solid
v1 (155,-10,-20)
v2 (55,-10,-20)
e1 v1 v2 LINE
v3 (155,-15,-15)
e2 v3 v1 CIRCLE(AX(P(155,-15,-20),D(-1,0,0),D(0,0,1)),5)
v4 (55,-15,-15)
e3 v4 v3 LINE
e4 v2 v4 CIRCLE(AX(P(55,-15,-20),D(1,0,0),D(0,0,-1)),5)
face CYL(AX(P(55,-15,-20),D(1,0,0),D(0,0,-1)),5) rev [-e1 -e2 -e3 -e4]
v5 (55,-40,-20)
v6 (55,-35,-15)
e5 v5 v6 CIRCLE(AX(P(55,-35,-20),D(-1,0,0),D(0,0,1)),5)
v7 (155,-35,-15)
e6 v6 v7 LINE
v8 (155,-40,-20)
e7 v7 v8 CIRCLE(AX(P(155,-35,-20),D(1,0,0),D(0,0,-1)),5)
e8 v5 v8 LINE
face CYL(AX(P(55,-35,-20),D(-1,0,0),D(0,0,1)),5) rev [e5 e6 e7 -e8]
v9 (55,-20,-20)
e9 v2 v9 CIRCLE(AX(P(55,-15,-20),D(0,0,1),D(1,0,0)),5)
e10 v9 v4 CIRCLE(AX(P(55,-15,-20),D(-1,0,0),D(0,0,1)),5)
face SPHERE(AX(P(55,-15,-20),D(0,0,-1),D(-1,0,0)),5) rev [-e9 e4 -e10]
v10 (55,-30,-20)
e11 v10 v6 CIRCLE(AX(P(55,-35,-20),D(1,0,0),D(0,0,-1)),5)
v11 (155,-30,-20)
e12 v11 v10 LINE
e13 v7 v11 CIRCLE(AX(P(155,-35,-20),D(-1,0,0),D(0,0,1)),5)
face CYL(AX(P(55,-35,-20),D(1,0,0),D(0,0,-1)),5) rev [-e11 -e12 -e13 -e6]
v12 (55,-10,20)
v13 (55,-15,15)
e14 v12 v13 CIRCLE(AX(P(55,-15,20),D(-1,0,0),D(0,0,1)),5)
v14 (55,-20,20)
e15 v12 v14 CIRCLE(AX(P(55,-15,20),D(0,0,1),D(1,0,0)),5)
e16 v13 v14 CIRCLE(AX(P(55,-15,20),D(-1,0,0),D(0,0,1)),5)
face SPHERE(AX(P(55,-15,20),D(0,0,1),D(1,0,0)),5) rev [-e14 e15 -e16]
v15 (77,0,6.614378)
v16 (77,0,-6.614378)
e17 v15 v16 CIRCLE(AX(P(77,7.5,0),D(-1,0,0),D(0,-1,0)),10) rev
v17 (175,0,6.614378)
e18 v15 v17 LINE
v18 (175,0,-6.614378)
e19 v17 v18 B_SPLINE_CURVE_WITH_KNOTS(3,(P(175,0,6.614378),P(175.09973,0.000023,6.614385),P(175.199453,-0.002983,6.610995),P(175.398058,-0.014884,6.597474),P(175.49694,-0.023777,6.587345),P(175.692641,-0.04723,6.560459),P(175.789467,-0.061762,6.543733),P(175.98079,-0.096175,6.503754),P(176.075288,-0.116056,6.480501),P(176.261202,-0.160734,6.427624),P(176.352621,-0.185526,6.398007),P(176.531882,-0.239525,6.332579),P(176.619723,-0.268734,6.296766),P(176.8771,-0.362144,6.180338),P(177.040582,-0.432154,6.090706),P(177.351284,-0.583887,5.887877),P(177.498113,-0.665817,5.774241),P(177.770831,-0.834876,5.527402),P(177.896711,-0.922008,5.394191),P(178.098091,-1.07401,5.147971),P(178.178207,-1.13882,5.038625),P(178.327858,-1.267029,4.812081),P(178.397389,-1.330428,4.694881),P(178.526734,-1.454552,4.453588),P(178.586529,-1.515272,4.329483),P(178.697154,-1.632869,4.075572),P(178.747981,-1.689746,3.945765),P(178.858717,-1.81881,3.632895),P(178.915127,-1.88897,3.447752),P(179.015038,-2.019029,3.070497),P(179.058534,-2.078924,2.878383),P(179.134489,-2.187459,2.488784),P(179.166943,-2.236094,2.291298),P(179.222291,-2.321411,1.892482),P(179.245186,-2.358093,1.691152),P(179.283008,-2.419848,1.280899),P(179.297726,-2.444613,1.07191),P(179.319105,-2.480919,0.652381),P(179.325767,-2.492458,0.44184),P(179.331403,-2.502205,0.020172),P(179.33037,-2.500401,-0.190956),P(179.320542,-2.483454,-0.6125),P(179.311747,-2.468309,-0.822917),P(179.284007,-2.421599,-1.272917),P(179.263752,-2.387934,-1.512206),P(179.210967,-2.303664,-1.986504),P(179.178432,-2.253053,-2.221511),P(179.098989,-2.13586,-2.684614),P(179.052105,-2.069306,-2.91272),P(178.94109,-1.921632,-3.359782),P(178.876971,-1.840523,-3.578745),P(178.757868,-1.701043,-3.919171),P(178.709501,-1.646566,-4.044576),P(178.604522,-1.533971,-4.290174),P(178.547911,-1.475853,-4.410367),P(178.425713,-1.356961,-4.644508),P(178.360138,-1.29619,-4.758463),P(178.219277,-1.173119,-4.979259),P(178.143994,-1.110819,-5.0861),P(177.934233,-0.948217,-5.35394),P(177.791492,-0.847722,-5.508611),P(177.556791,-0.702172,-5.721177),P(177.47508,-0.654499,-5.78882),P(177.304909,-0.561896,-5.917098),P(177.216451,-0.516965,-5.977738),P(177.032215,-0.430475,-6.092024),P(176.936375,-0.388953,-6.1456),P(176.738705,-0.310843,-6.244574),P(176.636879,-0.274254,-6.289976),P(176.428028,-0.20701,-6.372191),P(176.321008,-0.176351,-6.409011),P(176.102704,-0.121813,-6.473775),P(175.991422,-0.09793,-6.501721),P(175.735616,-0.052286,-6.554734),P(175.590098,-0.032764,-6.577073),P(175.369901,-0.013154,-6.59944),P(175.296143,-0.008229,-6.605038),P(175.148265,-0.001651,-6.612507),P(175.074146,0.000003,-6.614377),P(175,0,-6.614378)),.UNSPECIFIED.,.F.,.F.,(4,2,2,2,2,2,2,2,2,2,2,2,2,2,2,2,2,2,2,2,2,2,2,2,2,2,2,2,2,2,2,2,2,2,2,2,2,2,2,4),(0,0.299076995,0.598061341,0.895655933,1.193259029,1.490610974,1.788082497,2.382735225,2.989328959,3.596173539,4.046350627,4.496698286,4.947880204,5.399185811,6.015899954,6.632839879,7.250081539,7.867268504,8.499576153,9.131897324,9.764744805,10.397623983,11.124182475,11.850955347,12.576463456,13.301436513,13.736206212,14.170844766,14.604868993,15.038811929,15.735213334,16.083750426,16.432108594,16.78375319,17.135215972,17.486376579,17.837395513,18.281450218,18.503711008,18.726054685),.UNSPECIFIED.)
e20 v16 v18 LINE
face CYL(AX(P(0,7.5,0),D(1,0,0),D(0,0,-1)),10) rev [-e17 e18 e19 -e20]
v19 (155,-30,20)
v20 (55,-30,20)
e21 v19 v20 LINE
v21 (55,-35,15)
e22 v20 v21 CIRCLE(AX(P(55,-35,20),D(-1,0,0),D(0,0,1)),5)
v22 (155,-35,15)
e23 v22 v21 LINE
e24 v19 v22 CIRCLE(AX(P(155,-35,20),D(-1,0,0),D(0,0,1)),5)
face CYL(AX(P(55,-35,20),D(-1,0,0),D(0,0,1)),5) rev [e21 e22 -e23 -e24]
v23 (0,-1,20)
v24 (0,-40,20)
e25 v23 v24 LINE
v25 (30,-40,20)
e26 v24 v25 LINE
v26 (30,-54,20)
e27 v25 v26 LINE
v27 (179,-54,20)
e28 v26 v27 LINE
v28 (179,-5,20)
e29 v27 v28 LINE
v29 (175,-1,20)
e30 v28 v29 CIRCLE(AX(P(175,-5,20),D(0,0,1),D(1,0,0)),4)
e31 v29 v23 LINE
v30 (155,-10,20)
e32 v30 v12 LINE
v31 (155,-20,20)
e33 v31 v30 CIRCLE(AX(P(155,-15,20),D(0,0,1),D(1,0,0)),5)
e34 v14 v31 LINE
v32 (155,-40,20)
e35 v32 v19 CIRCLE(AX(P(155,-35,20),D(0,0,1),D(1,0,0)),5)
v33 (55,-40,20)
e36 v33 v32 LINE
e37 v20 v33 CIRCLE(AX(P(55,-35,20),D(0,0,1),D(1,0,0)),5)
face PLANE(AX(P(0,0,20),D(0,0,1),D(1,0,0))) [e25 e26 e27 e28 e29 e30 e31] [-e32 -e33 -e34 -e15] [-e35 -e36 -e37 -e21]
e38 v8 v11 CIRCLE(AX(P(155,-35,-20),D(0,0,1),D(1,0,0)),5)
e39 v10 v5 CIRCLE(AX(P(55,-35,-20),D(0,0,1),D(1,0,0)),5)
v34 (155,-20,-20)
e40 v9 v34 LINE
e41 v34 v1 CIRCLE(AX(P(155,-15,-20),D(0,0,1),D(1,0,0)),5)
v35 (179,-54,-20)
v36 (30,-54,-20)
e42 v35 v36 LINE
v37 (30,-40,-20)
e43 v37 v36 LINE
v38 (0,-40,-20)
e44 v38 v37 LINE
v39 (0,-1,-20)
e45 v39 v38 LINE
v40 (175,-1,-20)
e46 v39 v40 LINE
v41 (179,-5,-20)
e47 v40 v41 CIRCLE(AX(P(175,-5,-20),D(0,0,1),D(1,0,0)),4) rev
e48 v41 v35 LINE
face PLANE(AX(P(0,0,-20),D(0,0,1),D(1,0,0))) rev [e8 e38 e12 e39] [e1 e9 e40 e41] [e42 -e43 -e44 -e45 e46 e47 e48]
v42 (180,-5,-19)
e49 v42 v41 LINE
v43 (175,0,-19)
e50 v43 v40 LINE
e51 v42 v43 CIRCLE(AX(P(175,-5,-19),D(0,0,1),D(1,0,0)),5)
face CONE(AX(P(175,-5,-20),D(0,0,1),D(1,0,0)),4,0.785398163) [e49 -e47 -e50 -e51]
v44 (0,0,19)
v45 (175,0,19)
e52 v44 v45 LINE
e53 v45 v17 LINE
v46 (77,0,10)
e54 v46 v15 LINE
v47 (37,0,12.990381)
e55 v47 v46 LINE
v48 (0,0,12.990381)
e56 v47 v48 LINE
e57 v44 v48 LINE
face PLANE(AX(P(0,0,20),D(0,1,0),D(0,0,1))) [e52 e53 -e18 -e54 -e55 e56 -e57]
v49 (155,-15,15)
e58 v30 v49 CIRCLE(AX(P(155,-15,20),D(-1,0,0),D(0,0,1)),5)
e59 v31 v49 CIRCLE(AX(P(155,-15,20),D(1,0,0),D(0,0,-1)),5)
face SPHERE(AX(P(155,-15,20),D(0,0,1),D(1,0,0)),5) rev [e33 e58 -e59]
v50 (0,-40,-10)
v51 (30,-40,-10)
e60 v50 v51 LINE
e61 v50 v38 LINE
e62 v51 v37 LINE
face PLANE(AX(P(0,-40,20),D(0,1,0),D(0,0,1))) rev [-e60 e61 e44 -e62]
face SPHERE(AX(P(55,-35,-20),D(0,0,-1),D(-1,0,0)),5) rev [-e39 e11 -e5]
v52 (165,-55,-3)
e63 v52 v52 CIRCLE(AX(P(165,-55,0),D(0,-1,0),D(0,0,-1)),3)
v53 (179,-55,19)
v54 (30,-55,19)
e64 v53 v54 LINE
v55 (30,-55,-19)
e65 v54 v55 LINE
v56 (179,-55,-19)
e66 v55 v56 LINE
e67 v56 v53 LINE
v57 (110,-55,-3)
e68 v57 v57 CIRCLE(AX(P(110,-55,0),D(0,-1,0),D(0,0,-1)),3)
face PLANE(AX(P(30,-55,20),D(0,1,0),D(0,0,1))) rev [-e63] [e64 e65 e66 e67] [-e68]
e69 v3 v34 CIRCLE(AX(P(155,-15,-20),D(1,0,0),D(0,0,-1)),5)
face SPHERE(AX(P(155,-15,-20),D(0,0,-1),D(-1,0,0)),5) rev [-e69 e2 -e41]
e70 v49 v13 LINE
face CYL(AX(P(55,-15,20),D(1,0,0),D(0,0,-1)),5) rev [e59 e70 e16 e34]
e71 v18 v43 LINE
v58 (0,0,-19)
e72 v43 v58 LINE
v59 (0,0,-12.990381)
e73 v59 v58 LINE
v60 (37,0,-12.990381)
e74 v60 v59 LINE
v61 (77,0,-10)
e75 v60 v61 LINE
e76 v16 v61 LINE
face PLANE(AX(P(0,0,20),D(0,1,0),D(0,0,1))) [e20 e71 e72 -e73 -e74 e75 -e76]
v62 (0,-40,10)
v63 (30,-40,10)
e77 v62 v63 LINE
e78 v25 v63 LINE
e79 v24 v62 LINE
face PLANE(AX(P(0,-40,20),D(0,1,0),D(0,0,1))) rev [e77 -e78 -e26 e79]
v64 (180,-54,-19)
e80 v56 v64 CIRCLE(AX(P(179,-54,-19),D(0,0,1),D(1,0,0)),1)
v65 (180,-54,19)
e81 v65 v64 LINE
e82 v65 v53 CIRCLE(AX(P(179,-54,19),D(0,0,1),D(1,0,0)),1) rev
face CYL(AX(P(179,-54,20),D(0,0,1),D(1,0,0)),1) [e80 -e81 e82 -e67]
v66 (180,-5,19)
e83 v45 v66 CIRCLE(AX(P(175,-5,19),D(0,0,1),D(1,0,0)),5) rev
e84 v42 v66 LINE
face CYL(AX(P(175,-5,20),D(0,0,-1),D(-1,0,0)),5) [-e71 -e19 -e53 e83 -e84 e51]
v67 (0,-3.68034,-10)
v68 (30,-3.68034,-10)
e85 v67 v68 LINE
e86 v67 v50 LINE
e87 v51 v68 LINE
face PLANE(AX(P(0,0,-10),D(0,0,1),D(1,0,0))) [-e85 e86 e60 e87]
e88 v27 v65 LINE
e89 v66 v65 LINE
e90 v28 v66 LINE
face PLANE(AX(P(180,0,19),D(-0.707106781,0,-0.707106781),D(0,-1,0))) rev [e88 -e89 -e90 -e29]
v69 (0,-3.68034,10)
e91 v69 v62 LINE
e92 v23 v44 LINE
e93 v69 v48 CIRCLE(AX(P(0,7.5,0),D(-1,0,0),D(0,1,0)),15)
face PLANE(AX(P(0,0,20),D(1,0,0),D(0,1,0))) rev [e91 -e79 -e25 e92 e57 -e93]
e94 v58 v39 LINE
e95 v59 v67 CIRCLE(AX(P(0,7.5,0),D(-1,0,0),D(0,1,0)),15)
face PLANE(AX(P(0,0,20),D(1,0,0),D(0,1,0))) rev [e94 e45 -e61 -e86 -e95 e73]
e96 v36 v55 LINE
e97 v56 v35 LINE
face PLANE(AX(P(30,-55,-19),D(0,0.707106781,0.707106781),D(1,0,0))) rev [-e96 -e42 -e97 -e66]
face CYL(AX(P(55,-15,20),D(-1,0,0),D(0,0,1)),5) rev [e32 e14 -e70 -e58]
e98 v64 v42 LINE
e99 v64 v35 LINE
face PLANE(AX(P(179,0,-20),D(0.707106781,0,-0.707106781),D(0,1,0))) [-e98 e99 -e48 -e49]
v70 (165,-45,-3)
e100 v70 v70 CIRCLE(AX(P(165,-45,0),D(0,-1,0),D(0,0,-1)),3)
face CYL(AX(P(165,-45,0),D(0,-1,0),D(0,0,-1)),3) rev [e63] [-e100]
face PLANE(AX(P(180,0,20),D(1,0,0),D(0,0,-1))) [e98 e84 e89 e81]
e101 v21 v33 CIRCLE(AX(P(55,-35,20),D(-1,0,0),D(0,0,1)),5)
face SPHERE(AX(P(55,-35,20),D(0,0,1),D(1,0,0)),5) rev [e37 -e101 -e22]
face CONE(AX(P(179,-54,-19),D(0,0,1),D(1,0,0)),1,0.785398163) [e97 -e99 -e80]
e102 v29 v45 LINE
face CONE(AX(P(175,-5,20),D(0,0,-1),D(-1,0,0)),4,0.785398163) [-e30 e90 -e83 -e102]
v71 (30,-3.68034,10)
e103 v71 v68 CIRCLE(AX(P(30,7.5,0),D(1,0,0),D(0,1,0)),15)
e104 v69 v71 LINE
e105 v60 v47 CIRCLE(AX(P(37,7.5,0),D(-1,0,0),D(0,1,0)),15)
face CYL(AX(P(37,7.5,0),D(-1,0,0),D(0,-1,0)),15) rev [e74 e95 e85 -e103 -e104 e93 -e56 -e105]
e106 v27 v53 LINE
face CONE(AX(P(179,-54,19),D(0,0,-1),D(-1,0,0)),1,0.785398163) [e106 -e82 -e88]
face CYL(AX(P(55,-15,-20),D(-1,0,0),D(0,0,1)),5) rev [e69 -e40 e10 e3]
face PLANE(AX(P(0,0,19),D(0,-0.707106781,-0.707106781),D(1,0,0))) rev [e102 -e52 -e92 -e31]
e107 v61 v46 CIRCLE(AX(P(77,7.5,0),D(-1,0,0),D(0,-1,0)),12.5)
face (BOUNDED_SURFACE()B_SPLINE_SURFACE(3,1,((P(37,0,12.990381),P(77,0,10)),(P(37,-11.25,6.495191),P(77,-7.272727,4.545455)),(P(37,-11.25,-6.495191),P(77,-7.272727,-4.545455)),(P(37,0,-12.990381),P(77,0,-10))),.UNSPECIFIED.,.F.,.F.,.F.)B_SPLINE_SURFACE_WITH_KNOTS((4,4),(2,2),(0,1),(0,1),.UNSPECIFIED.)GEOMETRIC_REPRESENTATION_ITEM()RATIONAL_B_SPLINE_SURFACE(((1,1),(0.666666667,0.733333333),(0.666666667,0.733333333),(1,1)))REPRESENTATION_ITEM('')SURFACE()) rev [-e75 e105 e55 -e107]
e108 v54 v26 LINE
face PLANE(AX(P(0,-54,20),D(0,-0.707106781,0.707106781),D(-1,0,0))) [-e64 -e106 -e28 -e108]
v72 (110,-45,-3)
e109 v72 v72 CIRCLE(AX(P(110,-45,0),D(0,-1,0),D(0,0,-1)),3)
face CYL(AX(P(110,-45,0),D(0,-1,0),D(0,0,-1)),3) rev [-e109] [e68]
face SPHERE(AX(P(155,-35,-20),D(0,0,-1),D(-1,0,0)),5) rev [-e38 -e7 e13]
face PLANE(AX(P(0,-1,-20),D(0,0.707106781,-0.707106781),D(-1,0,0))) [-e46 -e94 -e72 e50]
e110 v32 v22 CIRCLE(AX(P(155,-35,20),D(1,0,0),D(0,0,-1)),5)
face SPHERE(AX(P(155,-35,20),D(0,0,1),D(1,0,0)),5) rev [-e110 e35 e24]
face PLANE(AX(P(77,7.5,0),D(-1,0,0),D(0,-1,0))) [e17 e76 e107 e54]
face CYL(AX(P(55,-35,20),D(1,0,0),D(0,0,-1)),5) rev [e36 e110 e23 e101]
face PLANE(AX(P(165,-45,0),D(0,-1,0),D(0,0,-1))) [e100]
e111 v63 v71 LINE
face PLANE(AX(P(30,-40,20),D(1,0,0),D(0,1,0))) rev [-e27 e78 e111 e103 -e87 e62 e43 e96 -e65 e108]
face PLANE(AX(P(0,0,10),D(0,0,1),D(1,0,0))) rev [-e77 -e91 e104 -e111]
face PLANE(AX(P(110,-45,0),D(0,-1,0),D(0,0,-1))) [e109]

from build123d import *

# Parameters (mm, degrees)
EXTRUDE_1_DEPTH                = 20
SKETCH_2_W                     = 30
SKETCH_2_H                     = 40
CUT_EXTRUDE_1_DEPTH            = 10
FILLET_1_R                     = 5
FILLET_2_R                     = 1
CUT_EXTRUDE_2_DEPTH            = 37
CUT_EXTRUDE_3_DEPTH            = 190.274932307
CHAMFER_1_SIZE                 = 1
CUT_EXTRUDE_4_DEPTH            = 5
FILLET_3_R                     = 5
PATTERN_LINEAR_7_COUNT         = 2
PATTERN_LINEAR_7_PITCH         = 20
FILLET_3_OF_PATTERN_LINEAR_7_R = 5
SKETCH_7_R                     = 3
CUT_EXTRUDE_5_DEPTH            = 10


# Read off the part's stored shape, not the designer's step: 대칭 복사4
with BuildPart() as part:
    # 스케치1 → 보스-돌출1 (new, symmetric)
    with BuildSketch(Plane.XY):
        Polygon((0, -40), (30, -40), (30, -55), (180, -55), (180, 0), (0, 0), align=None)
    extrude(amount=EXTRUDE_1_DEPTH, both=True)

    # 스케치2 → 컷-돌출1 (cut, symmetric)
    with BuildSketch(Plane.XY):
        with Locations((15, -20)):
            Rectangle(SKETCH_2_W, SKETCH_2_H)
    extrude(amount=CUT_EXTRUDE_1_DEPTH, both=True, mode=Mode.SUBTRACT)

    # 필렛1
    fillet_1_edges = [part.edges().sort_by_distance(p)[0] for p in [
        (180, 0, 0),
    ]]
    fillet(fillet_1_edges, radius=FILLET_1_R)

    # 필렛2
    fillet_2_edges = [part.edges().sort_by_distance(p)[0] for p in [
        (180, -55, 0),
    ]]
    fillet(fillet_2_edges, radius=FILLET_2_R)

    # 스케치3 → 컷-돌출2 (cut)
    with BuildSketch(Plane.ZY):
        with BuildLine():
            Line((-12.990381057, 0), (12.990381057, 0))
            ThreePointArc((12.990381057, 0), (0, -7.5), (-12.990381057, 0))
        make_face()
    extrude(amount=-CUT_EXTRUDE_2_DEPTH, mode=Mode.SUBTRACT)

    # 스케치4 → 컷-돌출3 (cut, through all)
    with BuildSketch(Plane(origin=(180, 0, 0), x_dir=(0, 0, -1), z_dir=(1, 0, 0))):
        with BuildLine():
            Line((-6.614378278, 0), (6.614378278, 0))
            ThreePointArc((6.614378278, 0), (0, -2.5), (-6.614378278, 0))
        make_face()
    extrude(amount=-CUT_EXTRUDE_3_DEPTH, mode=Mode.SUBTRACT)

    # 스케치6 for 컷-로프트1 → 컷-로프트1 section 0
    with BuildSketch(Plane.ZY.offset(-37)):
        with BuildLine():
            Line((-12.990381057, 0), (12.990381057, 0))
            # circular arc as an exact rational Bezier (weights 1, cos(half-angle), 1)
            Bezier((12.990381057, 0), (0, -22.5), (-12.990381057, 0), weights=[1, 0.5, 1])
        make_face()
    # 스케치5 for 컷-로프트1 → 컷-로프트1 section 1
    with BuildSketch(Plane.ZY.offset(-77)):
        with BuildLine():
            Line((-10, 0), (10, 0))
            Bezier((10, 0), (0, -13.333333333), (-10, 0), weights=[1, 0.6, 1])
        make_face()
    loft(mode=Mode.SUBTRACT)

    # 모따기1
    chamfer_1_edges = [part.edges().sort_by_distance(p)[0] for p in [
        (104.5, -55, 20),
        (87.5, 0, 20),
        (180, -29.5, -20),
        (178.535533906, -1.464466094, -20),
        (180, -29.5, 20),
        (178.535533906, -1.464466094, 20),
        (179.707106781, -54.707106781, -20),
        (179.707106781, -54.707106781, 20),
        (87.5, 0, -20),
        (104.5, -55, -20),
    ]]
    chamfer(chamfer_1_edges, length=CHAMFER_1_SIZE)

    # 스케치8 → 컷-돌출4 (cut)
    with BuildSketch(Plane.XY.offset(20)):
        with BuildLine():
            Line((55, -10), (155, -10))
            ThreePointArc((155, -10), (160, -15), (155, -20))
            Line((155, -20), (55, -20))
            ThreePointArc((55, -20), (50, -15), (55, -10))
        make_face()
    cut_extrude_4 = extrude(amount=-CUT_EXTRUDE_4_DEPTH, mode=Mode.SUBTRACT)

    # 필렛3
    fillet_3_edges = [part.edges().sort_by_distance(p)[0] for p in [
        (105, -20, 15),
        (105, -10, 15),
        (50, -15, 15),
        (160, -15, 15),
    ]]
    fillet(fillet_3_edges, radius=FILLET_3_R - 0.0001)  # a hair under: the kernel refuses the full size

    # 선형 패턴7: 컷-돌출4 ×2
    with Locations(*[(0, -i * PATTERN_LINEAR_7_PITCH, 0) for i in range(1, PATTERN_LINEAR_7_COUNT)]):
        add(cut_extrude_4, mode=Mode.SUBTRACT)

    # 필렛3 of 선형 패턴7
    fillet_3_of_pattern_linear_7_edges = [part.edges().sort_by_distance(p)[0] for p in [
        (105, -40, 15),
        (105, -30, 15),
        (50, -35, 15),
        (160, -35, 15),
    ]]
    fillet(fillet_3_of_pattern_linear_7_edges, radius=FILLET_3_OF_PATTERN_LINEAR_7_R - 0.0001)  # a hair under: the kernel refuses the full size

    # 대칭 복사4 outline → 대칭 복사4 (revolve, cut)
    with BuildSketch(Plane(origin=(0, -15, -20), x_dir=(0, 1, 0), z_dir=(0, 0, -1))):
        with BuildLine():
            ThreePointArc((0, 50), (3.535533906, 51.464466094), (5, 55))
            Line((5, 55), (5, 155))
            ThreePointArc((5, 155), (3.535533906, 158.535533906), (0, 160))
            Line((0, 160), (0, 50))
        make_face()
    revolve(axis=Axis((0, -15, -20), (1, 0, 0)), mode=Mode.SUBTRACT)

    # Mirror 4 2 outline → Mirror 4 2 (revolve, cut)
    with BuildSketch(Plane(origin=(0, -35, -20), x_dir=(0, 1, 0), z_dir=(0, 0, -1))):
        with BuildLine():
            ThreePointArc((0, 50), (3.535533906, 51.464466094), (5, 55))
            Line((5, 55), (5, 155))
            ThreePointArc((5, 155), (3.535533906, 158.535533906), (0, 160))
            Line((0, 160), (0, 50))
        make_face()
    revolve(axis=Axis((0, -35, -20), (1, 0, 0)), mode=Mode.SUBTRACT)

    # 스케치7 → 컷-돌출5 (cut)
    with BuildSketch(Plane.XZ.offset(55)):
        with Locations(Location((165, 0, 0), (0, 0, 270))):
            Circle(SKETCH_7_R)
        with Locations(Location((110, 0, 0), (0, 0, 270))):
            Circle(SKETCH_7_R)
    extrude(amount=-CUT_EXTRUDE_5_DEPTH, mode=Mode.SUBTRACT)


solid = part.part
